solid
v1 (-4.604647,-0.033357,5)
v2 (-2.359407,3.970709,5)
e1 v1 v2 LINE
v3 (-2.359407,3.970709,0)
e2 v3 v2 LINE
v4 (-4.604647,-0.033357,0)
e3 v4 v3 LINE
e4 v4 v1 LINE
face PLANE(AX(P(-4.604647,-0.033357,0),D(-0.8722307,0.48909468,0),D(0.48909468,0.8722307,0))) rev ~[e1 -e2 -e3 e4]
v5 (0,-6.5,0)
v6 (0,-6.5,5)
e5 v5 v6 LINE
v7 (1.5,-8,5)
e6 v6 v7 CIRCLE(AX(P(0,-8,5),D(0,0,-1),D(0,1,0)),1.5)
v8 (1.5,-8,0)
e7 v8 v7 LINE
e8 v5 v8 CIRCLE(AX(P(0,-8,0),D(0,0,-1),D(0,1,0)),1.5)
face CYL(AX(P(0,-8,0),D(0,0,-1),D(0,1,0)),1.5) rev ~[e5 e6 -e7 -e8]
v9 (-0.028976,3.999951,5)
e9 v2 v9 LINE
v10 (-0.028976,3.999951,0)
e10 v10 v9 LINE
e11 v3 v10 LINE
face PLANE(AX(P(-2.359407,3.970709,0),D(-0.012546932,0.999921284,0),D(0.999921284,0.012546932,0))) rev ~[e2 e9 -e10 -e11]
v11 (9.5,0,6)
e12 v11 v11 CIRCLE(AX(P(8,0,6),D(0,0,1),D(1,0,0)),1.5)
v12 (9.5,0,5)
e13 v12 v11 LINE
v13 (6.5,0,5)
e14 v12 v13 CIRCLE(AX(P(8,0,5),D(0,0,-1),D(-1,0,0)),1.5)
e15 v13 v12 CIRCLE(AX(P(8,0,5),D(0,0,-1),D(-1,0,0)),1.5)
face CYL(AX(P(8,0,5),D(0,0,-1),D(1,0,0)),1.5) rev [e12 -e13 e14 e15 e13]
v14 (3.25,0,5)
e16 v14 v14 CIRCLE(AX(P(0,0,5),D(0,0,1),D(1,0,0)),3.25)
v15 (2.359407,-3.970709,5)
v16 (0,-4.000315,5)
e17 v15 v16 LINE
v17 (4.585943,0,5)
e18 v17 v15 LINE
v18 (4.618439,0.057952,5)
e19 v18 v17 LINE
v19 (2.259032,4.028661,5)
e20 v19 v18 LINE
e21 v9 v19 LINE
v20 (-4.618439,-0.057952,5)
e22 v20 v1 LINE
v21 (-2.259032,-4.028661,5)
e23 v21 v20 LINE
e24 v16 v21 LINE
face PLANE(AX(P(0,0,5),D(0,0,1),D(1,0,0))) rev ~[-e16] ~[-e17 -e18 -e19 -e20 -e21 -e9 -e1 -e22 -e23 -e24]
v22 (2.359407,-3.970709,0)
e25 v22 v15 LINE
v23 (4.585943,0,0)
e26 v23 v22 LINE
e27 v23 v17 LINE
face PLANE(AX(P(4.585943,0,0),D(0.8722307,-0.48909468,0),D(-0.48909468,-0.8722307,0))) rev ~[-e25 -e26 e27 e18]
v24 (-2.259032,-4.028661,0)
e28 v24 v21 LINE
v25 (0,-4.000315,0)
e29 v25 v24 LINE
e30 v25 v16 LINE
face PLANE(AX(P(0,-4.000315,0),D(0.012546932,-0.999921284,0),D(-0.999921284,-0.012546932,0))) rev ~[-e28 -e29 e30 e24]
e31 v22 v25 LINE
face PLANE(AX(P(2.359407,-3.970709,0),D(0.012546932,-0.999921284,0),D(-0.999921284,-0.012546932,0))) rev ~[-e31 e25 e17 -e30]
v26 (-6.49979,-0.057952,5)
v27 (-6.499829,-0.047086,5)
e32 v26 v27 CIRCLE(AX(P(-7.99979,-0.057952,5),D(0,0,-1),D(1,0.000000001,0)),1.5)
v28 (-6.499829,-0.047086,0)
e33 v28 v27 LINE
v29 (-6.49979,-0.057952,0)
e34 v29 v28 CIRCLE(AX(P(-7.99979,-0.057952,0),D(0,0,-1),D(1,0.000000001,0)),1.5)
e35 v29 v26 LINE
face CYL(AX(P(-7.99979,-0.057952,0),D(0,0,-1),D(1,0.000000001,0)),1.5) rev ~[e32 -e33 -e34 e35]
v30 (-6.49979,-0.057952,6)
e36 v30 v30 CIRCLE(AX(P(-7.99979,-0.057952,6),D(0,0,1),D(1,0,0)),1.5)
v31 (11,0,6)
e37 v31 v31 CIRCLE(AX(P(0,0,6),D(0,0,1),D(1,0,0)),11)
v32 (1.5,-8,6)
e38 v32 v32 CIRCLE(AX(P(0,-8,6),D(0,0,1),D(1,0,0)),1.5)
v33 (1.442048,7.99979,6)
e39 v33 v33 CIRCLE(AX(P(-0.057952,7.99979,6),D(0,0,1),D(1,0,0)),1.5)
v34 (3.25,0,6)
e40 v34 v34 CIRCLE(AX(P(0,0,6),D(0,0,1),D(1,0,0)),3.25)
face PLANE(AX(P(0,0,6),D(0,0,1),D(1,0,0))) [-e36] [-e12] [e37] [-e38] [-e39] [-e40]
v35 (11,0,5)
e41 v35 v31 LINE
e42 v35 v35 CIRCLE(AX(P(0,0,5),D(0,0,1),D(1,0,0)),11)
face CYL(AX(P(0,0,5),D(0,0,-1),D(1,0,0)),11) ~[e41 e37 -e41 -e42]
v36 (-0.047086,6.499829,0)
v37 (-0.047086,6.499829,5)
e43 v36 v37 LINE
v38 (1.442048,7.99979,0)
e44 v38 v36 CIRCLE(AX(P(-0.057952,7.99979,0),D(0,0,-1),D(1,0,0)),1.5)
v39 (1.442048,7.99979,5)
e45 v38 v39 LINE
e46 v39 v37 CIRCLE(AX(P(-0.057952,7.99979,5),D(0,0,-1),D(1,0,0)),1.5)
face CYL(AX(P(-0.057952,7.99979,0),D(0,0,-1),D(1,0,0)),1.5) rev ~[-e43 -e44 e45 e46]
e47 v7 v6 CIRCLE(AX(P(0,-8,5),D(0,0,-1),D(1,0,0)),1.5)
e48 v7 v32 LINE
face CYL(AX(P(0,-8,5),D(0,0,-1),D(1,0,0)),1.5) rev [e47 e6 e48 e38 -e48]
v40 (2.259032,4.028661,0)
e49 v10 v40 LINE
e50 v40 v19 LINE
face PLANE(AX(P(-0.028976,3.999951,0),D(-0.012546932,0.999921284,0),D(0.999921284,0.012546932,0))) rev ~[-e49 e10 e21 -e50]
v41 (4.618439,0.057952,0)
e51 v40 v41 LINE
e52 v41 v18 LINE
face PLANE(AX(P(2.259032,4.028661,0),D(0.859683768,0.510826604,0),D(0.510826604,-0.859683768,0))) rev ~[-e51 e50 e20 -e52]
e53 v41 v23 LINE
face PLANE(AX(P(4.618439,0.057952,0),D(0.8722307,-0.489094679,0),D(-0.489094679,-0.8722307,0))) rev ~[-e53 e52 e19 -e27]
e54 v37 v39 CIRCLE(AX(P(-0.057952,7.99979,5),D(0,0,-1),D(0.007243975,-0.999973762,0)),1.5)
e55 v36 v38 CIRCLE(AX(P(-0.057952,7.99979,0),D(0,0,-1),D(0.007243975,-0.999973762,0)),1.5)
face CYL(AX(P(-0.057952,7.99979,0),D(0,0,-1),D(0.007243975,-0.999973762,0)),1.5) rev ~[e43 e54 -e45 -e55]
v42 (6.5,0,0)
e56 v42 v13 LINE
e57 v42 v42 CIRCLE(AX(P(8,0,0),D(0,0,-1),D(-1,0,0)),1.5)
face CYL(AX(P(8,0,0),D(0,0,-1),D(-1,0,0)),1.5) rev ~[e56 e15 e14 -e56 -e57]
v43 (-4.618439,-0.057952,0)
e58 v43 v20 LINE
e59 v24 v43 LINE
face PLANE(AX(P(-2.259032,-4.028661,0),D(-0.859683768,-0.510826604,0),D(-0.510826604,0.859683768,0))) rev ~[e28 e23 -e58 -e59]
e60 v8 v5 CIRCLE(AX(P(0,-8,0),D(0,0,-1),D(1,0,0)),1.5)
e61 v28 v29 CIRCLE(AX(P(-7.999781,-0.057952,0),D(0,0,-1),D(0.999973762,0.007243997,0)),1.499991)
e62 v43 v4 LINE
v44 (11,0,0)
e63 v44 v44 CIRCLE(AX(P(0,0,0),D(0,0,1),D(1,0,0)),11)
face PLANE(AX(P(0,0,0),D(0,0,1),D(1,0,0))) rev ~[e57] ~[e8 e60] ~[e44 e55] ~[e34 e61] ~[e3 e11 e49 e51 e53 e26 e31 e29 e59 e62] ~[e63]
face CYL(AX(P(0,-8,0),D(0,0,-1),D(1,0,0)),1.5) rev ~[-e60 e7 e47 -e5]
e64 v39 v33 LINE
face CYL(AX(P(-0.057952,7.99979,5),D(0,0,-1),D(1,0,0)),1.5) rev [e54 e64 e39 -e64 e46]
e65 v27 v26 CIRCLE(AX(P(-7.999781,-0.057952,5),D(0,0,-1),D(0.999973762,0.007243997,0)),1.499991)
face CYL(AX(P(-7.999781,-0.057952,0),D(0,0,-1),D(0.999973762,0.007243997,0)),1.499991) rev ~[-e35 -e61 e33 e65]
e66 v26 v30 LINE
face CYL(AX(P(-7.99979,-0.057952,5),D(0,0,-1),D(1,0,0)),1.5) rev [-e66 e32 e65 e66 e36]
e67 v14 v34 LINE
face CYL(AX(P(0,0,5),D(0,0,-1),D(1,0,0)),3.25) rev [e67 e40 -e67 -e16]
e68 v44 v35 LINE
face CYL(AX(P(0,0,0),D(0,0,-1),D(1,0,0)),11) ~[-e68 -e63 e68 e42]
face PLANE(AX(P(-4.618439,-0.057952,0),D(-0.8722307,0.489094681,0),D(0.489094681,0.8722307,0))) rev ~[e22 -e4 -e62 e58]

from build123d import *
from build123d import SkipClean  # not in build123d's __all__

# Parameters (mm, degrees)
F0_R     = 11
F1_DEPTH = 5
F2_R     = 11
F2_R_2   = 1.5
F2_R_3   = 3.25
F3_DEPTH = 1


with BuildPart() as f1:
    # F0 (on Top) → F1 (new body)
    with BuildSketch(Plane.XY):
        Circle(F0_R)
        with BuildLine():
            ThreePointArc((-6.4997900966, -0.0579517981), (-9.4997802573, -0.0633848148), (-6.4998294535, -0.0470858359))
            ThreePointArc((-6.4998294535, -0.0470858359), (-6.4997999358, -0.0525187813), (-6.4997900966, -0.0579517981))
        make_face(mode=Mode.SUBTRACT)
        with BuildLine():
            ThreePointArc((1.5, -8), (-1.0606601718, -9.0606601718), (0, -6.5))
            ThreePointArc((0, -6.5), (1.0606601718, -6.9393398282), (1.5, -8))
        make_face(mode=Mode.SUBTRACT)
        with BuildLine():
            ThreePointArc((1.4420482019, 7.9997900966), (1.0065431393, 6.9429786051), (-0.0470858359, 6.4998294535))
            ThreePointArc((-0.0470858359, 6.4998294535), (-1.1224467354, 9.056601588), (1.4420482019, 7.9997900966))
        make_face(mode=Mode.SUBTRACT)
        Polygon((-0.0289763065, 3.9999512958), (2.259031561, 4.0286610356), (4.6184385806, 0.0579517981), (4.5859426869, 0), (2.3594070196, -3.9707092376), (0, -4.0003148882), (-2.259031561, -4.0286610356), (-4.6184385806, -0.0579517981), (-4.6046471933, -0.0333568232), (-2.3594070196, 3.9707092376), align=None, mode=Mode.SUBTRACT)
        with BuildLine():
            ThreePointArc((9.5, 0), (8, -1.5), (6.5, 0))
            ThreePointArc((6.5, 0), (8, 1.5), (9.5, 0))
        make_face(mode=Mode.SUBTRACT)
    extrude(amount=F1_DEPTH)

    # F2 (on face) → F3 (join)
    with BuildSketch(Plane.XY.offset(5)):
        Circle(F2_R)
        with Locations((-7.9997900966, -0.0579517981)):
            Circle(F2_R_2, mode=Mode.SUBTRACT)
        with Locations((0, -8)):
            Circle(F2_R_2, mode=Mode.SUBTRACT)
        with Locations((-0.0579517981, 7.9997900966)):
            Circle(F2_R_2, mode=Mode.SUBTRACT)
        Polygon((-4.6184385806, -0.0579517981), (-2.3594070196, 3.9707092376), (2.259031561, 4.0286610356), (4.6184385806, 0.0579517981), (2.3594070196, -3.9707092376), (-2.259031561, -4.0286610356), align=None, mode=Mode.SUBTRACT)
        with Locations((8, 0)):
            Circle(F2_R_2, mode=Mode.SUBTRACT)
        Polygon((2.259031561, 4.0286610356), (-2.3594070196, 3.9707092376), (-4.6184385806, -0.0579517981), (-2.259031561, -4.0286610356), (2.3594070196, -3.9707092376), (4.6184385806, 0.0579517981), align=None)
        Circle(F2_R_3, mode=Mode.SUBTRACT)
    with SkipClean():  # cleaning this boolean's faces spoils the solid; the shape is the same uncleaned
        extrude(amount=F3_DEPTH)


solid = f1.part
